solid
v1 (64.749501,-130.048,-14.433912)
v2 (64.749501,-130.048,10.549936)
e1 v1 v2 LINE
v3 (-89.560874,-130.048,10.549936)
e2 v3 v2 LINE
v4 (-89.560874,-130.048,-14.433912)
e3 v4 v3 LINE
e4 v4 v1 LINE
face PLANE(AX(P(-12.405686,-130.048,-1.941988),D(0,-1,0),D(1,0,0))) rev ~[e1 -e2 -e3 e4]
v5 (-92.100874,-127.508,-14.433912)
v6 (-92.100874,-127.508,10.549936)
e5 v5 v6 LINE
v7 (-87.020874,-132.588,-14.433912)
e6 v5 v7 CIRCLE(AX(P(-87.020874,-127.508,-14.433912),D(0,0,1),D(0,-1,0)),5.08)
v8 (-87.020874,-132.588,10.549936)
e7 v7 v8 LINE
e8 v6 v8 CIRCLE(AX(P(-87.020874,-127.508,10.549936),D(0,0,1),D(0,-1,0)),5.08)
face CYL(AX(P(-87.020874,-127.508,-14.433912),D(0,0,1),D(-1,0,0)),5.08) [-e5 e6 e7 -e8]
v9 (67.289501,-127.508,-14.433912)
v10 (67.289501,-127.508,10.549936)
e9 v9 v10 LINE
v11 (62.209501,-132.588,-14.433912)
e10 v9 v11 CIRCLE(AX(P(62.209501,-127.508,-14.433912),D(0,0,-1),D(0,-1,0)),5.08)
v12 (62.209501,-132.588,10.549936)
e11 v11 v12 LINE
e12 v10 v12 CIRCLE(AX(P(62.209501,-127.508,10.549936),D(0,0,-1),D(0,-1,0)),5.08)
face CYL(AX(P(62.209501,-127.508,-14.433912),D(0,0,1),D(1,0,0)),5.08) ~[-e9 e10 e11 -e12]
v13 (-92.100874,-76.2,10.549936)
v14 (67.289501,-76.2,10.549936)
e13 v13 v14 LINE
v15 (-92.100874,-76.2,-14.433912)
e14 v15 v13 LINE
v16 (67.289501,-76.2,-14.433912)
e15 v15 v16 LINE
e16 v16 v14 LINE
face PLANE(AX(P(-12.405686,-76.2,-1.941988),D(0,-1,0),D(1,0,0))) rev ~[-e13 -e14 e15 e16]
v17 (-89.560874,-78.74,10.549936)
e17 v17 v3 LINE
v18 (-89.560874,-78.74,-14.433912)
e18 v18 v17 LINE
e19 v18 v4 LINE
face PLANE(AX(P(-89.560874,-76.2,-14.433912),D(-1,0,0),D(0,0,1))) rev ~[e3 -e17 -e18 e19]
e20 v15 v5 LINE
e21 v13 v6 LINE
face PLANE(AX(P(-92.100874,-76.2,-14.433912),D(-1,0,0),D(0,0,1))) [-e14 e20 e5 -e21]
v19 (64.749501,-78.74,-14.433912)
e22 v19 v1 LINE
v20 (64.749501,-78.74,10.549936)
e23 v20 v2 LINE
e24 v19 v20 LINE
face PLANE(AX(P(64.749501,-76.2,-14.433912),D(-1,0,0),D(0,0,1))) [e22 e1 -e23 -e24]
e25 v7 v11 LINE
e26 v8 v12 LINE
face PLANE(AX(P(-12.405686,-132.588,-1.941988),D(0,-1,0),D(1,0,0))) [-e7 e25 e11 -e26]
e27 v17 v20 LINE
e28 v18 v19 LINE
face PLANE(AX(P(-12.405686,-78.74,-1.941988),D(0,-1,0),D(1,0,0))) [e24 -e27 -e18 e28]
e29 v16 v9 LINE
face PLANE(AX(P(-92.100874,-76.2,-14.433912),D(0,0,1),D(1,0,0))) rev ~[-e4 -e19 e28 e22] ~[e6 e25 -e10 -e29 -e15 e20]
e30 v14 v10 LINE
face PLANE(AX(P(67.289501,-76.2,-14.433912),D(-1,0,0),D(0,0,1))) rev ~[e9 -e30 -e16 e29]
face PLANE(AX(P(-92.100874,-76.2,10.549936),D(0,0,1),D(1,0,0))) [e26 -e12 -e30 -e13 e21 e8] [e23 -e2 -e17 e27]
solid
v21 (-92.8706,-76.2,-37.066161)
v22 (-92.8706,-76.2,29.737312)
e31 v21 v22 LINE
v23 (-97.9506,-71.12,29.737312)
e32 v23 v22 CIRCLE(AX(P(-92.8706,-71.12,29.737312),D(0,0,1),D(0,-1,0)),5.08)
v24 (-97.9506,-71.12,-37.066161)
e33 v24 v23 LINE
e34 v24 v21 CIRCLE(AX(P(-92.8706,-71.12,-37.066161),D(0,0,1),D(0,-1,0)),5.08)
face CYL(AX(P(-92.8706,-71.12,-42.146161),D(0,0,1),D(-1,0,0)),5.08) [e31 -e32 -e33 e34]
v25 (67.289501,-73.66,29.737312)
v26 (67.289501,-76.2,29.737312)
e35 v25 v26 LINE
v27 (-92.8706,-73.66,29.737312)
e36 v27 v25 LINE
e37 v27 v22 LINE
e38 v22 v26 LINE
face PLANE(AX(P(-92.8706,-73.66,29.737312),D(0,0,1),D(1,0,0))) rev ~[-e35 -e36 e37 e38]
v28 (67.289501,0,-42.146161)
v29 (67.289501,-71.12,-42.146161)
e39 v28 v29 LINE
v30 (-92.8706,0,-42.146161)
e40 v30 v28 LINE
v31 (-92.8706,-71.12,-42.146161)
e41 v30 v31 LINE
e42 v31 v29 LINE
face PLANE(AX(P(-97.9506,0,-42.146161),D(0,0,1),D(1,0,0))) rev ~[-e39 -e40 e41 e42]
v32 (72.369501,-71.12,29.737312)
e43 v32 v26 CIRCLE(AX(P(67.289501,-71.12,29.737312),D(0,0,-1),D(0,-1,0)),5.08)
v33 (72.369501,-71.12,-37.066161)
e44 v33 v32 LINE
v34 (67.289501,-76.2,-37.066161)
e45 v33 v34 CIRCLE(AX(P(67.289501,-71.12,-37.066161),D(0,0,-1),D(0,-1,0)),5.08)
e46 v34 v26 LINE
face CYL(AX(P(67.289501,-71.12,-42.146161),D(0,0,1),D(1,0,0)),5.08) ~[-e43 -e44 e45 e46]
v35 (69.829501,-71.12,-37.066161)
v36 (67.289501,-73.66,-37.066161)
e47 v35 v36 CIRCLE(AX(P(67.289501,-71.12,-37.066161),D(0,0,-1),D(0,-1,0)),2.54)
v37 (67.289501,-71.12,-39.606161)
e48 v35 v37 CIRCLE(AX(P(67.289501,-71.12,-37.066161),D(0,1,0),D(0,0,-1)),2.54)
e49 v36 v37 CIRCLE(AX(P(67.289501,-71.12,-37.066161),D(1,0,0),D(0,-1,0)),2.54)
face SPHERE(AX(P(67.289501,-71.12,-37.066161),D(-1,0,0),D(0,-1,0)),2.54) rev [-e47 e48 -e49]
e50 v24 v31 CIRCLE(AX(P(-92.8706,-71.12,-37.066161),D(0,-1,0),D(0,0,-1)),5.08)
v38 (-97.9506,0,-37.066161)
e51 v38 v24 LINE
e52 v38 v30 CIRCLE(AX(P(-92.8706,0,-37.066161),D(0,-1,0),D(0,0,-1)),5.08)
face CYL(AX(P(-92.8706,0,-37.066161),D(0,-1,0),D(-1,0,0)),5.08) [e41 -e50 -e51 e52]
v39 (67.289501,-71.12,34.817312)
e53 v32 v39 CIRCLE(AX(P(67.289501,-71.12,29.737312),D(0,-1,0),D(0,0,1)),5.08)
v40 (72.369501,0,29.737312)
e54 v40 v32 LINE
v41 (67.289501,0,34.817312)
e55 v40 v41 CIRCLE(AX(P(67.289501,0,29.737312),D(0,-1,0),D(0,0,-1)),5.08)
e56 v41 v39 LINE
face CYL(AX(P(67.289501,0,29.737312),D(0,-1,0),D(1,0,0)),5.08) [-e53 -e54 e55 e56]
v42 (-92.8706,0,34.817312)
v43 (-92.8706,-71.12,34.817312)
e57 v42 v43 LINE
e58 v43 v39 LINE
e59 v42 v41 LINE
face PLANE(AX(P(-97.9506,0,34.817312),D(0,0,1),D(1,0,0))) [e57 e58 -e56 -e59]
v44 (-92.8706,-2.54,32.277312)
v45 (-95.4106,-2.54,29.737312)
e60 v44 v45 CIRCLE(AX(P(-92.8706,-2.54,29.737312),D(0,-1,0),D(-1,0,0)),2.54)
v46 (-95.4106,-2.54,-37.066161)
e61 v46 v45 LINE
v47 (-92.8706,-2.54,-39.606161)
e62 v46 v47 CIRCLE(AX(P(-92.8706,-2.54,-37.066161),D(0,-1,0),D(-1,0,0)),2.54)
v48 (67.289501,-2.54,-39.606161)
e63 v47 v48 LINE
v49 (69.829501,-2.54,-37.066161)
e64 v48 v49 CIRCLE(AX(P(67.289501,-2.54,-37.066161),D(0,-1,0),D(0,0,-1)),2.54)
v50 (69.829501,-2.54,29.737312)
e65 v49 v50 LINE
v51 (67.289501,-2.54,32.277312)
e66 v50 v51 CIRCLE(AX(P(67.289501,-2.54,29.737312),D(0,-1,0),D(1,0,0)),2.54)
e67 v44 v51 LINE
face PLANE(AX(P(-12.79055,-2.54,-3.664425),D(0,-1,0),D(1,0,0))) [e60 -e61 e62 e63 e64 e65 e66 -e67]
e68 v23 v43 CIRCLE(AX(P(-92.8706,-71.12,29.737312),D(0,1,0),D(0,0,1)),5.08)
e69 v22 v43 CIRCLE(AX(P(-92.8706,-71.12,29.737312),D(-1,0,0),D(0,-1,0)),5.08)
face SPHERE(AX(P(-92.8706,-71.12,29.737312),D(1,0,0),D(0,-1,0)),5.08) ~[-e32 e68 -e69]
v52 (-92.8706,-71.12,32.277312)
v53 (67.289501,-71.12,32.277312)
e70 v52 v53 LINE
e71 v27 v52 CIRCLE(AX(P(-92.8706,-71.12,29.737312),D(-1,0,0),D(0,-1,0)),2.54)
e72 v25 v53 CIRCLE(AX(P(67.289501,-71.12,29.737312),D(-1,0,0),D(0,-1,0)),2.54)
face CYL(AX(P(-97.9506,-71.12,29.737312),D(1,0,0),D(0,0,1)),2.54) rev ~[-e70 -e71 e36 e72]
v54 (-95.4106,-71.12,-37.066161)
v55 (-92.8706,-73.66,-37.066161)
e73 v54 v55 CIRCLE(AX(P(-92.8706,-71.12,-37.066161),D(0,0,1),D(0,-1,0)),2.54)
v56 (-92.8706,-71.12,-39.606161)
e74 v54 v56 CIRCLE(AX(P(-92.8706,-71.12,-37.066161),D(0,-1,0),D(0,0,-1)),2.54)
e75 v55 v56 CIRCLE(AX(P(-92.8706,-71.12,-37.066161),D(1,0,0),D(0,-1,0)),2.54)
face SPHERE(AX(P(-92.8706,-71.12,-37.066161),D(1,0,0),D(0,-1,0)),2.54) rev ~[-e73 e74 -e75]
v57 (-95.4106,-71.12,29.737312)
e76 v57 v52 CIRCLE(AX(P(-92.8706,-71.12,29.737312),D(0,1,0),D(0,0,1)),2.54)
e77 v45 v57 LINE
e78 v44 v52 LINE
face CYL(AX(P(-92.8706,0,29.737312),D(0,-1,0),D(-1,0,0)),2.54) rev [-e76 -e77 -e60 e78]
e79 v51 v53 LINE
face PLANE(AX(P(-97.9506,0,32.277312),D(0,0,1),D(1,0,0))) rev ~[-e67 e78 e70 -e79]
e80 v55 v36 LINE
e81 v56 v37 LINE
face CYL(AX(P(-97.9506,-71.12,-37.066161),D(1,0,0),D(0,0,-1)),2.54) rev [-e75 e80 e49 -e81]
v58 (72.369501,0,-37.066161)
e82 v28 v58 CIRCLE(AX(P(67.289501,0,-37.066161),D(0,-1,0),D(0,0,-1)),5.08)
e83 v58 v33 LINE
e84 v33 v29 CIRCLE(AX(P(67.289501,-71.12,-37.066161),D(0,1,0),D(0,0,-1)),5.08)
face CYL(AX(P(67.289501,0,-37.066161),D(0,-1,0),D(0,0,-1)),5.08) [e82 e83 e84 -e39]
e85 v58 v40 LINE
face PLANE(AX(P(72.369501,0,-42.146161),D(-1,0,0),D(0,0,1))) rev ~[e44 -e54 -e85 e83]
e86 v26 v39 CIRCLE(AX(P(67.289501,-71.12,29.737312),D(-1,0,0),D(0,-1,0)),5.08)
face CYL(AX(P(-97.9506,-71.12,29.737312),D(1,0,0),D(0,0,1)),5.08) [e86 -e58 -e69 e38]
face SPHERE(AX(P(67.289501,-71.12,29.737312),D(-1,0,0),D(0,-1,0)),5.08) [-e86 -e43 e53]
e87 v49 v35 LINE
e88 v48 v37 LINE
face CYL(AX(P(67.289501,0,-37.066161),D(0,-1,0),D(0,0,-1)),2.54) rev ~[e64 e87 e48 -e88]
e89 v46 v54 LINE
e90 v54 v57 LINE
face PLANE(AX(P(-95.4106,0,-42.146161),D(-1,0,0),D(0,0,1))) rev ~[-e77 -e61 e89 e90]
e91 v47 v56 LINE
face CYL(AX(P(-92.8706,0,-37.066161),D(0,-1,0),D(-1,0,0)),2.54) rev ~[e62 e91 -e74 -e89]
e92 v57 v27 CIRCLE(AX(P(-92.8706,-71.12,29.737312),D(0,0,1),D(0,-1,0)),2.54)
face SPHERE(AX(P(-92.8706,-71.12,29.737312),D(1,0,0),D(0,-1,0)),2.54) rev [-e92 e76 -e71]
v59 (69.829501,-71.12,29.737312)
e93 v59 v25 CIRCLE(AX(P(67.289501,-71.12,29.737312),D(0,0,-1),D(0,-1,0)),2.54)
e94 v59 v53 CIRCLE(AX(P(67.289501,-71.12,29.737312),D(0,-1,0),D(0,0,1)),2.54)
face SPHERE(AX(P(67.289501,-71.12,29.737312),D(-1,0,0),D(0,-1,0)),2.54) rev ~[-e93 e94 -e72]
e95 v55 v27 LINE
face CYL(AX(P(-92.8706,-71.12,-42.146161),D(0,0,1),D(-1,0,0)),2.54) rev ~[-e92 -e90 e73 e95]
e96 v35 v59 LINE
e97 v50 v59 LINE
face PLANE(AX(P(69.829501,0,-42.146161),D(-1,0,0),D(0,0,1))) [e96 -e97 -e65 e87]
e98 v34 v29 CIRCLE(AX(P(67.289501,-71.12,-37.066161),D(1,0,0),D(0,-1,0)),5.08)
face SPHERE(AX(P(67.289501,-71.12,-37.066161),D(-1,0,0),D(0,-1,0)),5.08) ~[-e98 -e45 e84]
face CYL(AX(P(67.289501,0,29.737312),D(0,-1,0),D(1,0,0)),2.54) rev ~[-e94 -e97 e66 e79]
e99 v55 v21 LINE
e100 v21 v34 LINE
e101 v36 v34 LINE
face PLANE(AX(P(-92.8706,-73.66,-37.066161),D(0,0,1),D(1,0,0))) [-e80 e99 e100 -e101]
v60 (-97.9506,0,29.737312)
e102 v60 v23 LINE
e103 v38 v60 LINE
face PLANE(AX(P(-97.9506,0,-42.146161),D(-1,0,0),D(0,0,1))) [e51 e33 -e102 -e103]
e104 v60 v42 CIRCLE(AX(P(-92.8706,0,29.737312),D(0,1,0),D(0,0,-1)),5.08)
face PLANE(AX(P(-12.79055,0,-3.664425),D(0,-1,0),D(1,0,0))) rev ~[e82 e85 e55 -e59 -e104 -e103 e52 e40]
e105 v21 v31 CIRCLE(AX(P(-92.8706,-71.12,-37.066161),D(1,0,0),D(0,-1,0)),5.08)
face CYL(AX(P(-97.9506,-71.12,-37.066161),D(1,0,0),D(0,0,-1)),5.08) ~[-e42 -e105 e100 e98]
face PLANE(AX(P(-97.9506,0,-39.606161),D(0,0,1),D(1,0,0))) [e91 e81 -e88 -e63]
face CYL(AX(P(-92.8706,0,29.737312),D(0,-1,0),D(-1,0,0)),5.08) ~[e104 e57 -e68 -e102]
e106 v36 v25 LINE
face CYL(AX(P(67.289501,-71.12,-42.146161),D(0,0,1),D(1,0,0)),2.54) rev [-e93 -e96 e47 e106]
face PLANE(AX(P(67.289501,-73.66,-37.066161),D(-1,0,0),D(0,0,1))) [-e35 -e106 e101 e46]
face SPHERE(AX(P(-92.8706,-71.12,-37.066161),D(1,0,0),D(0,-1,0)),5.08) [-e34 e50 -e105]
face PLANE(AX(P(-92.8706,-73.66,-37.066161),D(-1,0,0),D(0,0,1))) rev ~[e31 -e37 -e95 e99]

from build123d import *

# Parameters (mm, degrees)
F0_W     = 170.3201010823
F0_H     = 76.9634731114
F1_DEPTH = 76.2
F2_R     = 5.08
F4_T     = -2.54
F5_W     = 159.3903745842
F5_H     = 24.9838475138
F6_DEPTH = 56.388
F7_T     = -2.54
F8_R     = 5.08


# Not quite as in the source:
# - a shell that OpenCascade refuses in one call is made with other operations: the cavity is built on its own and cut out


with BuildPart() as f1:
    # F0 (on Front) → F1 (new body)
    with BuildSketch(Plane.XZ):
        with Locations((-12.7905495465, -3.6644246429)):
            Rectangle(F0_W, F0_H)
    extrude(amount=F1_DEPTH)

    # F2
    f2_edges = [f1.edges().sort_by_distance(p)[0] for p in [
        (-12.79055, -76.2, 34.817312),
        (-12.79055, -76.2, -42.146161),
        (-97.9506, -76.2, -3.664425),
        (72.369501, -76.2, -3.664425),
        (72.369501, -38.1, -42.146161),
        (72.369501, -38.1, 34.817312),
        (-97.9506, -38.1, 34.817312),
        (-97.9506, -38.1, -42.146161),
    ]]
    fillet(f2_edges, radius=F2_R)

    # F4: a shell. OpenCascade refuses it in one call, so the cavity is built on its own and cut out:
    # the body offset inwards by the wall thickness, plus a prism from it out through each open face.
    f4_core = offset(f1.part, amount=F4_T, mode=Mode.PRIVATE)
    f4_exits = [f4_core.faces().sort_by_distance(p)[0] for p in [
        (-12.79055, -73.66, -3.664425),
    ]]
    add(f4_core, mode=Mode.SUBTRACT)
    extrude(f4_exits, amount=-F4_T, mode=Mode.SUBTRACT)


with BuildPart() as f6:
    # F5 (on face) → F6 (new body)
    with BuildSketch(Plane.XZ.offset(76.2)):
        with Locations((-12.4056862974, -1.9419882447)):
            Rectangle(F5_W, F5_H)
    extrude(amount=F6_DEPTH)

    # F7
    f7_openings = [f6.faces().sort_by_distance(p)[0] for p in [
        (-12.405686, -104.394, 10.549936),
        (-12.405686, -104.394, -14.433912),
    ]]
    offset(amount=F7_T, openings=f7_openings)

    # F8
    f8_edges = [f6.edges().sort_by_distance(p)[0] for p in [
        (-92.100874, -132.588, -1.941988),
        (67.289501, -132.588, -1.941988),
    ]]
    fillet(f8_edges, radius=F8_R)


solid = Compound([f1.part, f6.part])
